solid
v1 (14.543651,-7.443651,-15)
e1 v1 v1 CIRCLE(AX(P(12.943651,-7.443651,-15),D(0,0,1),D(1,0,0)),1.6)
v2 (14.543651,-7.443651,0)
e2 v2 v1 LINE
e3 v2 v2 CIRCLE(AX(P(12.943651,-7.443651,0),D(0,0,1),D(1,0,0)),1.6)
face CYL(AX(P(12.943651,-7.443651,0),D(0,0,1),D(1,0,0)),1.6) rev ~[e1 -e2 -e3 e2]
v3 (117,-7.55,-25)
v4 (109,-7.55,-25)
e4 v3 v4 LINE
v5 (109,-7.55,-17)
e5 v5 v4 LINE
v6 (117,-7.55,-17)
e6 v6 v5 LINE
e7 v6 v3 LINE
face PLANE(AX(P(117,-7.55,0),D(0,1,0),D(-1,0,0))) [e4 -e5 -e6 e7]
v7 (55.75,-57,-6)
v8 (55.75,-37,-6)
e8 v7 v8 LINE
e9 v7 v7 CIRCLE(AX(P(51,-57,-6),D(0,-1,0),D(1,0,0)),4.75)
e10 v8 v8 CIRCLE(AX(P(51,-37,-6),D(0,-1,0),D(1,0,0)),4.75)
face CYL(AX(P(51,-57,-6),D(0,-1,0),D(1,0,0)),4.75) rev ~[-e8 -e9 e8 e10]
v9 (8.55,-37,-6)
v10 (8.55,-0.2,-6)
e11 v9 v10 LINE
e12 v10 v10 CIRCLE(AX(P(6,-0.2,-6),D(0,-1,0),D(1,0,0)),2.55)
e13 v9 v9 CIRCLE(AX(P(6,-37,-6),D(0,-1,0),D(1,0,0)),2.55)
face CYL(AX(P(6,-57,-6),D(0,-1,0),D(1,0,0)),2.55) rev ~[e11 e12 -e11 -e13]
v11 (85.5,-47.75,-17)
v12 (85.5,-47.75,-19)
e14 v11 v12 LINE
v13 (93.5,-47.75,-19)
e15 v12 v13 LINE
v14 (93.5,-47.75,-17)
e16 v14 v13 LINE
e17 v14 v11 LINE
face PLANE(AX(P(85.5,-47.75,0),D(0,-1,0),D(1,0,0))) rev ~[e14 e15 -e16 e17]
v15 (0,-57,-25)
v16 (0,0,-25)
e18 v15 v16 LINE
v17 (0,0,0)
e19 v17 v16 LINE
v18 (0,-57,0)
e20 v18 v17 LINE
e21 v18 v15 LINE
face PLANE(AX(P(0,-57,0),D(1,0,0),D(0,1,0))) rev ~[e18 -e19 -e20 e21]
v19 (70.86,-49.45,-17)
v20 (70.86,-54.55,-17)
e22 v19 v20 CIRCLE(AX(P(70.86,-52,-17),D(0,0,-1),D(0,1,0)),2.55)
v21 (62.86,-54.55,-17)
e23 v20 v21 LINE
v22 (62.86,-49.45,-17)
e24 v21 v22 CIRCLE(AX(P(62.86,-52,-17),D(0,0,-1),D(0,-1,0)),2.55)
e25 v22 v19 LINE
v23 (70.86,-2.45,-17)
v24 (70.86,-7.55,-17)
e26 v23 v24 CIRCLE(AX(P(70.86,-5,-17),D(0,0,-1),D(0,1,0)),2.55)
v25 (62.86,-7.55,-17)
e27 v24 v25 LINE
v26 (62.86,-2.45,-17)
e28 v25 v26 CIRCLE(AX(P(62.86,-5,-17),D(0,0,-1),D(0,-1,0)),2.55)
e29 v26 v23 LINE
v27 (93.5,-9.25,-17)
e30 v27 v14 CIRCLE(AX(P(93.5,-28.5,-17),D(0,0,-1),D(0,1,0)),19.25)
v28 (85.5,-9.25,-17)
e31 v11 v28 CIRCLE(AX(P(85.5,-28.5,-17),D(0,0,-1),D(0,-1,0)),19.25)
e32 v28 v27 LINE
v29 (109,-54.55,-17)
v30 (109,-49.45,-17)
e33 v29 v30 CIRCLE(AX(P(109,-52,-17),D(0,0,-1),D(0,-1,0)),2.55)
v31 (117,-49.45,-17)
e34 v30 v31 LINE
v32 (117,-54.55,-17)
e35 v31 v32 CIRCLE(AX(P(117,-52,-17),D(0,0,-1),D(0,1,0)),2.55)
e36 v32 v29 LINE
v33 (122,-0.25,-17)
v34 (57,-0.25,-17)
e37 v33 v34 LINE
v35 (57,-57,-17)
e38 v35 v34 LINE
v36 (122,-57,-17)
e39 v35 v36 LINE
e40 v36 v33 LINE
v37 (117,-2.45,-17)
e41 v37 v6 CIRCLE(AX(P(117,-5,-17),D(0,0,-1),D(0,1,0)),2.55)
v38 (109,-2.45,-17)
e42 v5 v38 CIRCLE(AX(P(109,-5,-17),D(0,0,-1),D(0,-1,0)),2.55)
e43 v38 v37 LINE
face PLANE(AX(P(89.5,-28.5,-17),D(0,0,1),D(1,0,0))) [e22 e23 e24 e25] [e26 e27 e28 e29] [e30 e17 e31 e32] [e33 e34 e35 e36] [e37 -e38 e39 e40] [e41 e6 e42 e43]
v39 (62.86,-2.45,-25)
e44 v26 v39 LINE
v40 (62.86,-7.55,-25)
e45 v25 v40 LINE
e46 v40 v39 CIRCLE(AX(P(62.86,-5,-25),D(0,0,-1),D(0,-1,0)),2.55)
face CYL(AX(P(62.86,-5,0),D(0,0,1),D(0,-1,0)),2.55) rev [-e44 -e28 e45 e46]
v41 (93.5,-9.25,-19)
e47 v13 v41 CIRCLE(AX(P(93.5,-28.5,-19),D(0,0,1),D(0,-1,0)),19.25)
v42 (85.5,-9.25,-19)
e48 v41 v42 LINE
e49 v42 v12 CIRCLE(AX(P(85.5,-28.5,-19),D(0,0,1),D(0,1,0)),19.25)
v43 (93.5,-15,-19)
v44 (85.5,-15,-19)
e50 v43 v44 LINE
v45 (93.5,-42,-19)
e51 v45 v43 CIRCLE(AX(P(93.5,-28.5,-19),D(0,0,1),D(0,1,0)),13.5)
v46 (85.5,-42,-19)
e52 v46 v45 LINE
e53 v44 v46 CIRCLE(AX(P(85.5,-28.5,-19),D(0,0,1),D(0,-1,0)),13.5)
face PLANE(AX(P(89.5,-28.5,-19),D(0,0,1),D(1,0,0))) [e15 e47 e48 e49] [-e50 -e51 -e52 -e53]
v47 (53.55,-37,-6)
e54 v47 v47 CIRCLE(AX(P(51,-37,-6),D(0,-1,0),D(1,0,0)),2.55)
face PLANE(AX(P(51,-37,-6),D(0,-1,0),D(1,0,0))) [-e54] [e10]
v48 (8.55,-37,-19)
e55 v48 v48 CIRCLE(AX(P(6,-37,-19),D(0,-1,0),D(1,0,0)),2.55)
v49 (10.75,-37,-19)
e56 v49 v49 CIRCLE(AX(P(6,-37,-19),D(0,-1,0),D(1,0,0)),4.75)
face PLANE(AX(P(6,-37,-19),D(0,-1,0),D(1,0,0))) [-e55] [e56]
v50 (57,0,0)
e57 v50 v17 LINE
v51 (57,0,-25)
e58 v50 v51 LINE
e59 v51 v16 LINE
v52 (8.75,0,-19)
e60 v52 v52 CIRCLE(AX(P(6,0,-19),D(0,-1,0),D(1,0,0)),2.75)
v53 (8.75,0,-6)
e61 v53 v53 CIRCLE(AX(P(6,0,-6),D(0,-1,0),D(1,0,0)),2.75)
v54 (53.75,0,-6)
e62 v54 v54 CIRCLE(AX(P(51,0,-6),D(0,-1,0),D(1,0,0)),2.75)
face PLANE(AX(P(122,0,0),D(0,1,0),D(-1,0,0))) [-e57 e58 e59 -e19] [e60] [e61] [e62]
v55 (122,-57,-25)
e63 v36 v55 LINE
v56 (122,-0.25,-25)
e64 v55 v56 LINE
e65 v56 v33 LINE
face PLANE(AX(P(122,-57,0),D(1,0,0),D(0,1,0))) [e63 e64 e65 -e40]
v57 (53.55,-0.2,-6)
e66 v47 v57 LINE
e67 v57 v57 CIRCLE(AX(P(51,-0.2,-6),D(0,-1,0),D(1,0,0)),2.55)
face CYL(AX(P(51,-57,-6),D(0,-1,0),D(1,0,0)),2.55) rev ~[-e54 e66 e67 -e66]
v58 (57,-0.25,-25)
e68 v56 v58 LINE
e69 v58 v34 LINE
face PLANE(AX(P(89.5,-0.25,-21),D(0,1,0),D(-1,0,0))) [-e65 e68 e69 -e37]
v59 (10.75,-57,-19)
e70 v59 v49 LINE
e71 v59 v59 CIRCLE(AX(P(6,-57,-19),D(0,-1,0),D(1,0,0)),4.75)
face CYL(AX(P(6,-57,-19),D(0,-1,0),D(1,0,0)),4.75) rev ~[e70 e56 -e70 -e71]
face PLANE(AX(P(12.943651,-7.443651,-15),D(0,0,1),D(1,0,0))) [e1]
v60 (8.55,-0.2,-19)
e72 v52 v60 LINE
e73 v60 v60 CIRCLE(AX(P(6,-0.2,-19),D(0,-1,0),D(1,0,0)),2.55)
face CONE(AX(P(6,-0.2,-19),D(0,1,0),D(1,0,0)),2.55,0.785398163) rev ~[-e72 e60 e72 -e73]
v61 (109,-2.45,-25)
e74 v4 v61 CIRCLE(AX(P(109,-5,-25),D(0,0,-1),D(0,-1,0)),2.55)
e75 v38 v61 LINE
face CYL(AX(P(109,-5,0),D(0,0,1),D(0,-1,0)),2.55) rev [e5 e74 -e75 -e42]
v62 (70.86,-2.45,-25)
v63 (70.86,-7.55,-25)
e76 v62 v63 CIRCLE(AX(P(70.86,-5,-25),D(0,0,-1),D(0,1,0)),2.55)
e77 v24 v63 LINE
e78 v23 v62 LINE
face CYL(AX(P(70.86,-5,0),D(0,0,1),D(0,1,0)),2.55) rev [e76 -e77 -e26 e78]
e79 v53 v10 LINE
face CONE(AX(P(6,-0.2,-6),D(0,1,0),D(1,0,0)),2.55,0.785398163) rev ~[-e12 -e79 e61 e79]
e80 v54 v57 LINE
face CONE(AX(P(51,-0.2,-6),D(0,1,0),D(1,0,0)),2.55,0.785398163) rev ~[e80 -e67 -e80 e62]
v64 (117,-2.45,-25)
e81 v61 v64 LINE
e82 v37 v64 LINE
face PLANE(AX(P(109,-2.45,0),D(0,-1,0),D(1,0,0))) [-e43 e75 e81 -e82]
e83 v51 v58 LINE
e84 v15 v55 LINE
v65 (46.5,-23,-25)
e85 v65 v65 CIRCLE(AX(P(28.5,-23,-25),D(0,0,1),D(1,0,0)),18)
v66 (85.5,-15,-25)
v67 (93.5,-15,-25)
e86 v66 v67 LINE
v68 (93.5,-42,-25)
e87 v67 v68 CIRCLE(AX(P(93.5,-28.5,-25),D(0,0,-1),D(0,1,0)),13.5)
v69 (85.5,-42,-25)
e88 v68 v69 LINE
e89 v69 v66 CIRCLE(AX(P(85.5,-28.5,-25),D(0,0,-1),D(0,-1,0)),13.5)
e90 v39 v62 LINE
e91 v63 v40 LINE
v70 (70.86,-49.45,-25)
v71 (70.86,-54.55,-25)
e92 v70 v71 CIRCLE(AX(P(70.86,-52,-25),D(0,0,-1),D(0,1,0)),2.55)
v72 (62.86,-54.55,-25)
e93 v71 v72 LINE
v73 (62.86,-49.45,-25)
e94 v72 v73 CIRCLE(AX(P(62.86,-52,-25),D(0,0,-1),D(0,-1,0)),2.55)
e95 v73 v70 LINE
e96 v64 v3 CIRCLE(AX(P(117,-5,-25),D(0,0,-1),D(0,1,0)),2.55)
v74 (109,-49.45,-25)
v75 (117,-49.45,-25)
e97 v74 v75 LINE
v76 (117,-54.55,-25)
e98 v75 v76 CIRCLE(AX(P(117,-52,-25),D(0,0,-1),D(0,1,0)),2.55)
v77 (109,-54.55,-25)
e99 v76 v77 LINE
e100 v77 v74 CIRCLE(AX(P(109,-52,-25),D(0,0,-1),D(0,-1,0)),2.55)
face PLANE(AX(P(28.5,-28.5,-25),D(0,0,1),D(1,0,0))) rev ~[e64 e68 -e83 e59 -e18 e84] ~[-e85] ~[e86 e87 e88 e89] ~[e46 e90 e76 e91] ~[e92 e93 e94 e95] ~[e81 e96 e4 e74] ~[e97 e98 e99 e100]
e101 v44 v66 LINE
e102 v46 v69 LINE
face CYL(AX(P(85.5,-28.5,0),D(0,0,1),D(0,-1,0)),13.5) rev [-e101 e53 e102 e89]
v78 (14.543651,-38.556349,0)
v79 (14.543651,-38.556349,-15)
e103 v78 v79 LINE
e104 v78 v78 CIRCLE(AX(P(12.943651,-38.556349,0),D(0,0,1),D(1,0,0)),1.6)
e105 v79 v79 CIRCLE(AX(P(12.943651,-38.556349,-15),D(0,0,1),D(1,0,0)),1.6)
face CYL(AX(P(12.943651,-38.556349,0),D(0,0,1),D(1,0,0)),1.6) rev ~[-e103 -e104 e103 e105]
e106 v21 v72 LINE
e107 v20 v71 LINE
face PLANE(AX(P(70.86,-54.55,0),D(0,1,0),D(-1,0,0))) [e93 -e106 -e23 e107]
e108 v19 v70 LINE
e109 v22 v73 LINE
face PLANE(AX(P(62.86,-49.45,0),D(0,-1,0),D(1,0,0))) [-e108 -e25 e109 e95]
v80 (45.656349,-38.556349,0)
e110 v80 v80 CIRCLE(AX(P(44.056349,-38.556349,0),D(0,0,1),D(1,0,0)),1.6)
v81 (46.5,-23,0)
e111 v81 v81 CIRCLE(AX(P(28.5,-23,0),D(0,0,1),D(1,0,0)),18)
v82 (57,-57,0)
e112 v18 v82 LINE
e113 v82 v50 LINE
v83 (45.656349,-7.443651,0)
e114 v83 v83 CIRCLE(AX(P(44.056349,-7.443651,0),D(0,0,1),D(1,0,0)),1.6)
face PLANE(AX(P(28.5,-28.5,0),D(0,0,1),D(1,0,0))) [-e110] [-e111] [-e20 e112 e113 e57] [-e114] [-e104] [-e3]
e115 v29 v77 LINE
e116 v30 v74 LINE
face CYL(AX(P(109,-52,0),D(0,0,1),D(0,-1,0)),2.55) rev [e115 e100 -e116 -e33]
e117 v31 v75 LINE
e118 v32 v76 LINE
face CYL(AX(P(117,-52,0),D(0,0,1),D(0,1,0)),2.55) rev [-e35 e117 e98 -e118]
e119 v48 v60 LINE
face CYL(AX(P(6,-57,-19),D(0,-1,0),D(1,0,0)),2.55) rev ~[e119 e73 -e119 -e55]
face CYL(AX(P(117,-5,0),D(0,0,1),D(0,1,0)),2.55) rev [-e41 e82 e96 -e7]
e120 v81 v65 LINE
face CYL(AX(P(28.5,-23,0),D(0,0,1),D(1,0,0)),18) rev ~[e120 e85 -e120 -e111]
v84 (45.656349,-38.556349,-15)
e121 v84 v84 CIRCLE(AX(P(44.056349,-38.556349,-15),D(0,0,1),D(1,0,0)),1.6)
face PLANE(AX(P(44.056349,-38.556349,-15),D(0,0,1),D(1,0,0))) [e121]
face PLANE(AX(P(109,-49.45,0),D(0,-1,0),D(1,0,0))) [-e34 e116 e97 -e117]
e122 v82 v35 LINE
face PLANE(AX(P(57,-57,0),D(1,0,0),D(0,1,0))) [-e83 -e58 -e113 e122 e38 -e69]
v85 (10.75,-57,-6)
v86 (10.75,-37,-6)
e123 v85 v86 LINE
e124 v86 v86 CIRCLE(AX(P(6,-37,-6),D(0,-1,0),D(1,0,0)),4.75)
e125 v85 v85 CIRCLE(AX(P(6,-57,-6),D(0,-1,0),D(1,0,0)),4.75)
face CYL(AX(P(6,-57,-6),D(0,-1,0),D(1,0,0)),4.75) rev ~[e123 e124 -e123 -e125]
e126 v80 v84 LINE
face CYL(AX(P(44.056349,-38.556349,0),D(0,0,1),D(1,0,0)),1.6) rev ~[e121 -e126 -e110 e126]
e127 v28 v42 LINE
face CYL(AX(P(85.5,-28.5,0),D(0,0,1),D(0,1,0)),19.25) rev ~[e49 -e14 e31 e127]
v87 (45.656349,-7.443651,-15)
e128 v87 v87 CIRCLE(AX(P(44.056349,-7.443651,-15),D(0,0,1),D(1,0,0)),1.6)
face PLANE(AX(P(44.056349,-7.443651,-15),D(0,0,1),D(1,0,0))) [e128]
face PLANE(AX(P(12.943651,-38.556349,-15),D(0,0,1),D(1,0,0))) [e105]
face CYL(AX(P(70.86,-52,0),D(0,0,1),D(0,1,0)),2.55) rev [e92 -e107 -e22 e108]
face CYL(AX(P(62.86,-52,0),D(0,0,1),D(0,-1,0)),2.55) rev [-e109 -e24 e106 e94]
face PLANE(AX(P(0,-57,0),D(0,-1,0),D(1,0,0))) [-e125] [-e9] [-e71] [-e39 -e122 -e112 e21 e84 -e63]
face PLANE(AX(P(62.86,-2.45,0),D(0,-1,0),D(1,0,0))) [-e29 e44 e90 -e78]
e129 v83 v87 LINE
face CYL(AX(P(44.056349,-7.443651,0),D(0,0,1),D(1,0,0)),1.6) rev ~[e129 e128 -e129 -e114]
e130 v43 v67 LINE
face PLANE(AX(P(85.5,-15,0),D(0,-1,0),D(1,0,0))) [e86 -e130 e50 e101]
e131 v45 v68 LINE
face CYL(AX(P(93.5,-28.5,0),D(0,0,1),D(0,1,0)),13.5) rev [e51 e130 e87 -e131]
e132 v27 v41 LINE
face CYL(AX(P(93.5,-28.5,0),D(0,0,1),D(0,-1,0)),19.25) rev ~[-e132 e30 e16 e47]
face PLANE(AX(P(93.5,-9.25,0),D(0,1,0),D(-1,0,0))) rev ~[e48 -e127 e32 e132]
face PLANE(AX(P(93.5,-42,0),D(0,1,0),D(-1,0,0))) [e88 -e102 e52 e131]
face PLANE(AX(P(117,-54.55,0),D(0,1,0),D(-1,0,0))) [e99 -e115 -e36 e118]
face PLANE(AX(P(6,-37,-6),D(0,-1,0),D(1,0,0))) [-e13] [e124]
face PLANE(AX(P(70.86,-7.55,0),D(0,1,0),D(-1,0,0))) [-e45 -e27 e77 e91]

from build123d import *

# Parameters (mm, degrees)
F0_W     = 57
F0_H     = 57
F0_R     = 1.6
F0_R_2   = 18
F0_W_2   = 65
F1_DEPTH = 25
F2_DEPTH = 17
F3_DEPTH = 19
F4_R     = 2.55
F5_DEPTH = 60
F4_R_2   = 4.75
F6_DEPTH = 20
F7_DEPTH = 15
F8_W     = 65
F8_H     = 8
F9_DEPTH = 0.25
F10_SIZE = 0.2


# Not quite as in the source:
# - a feature names something its author has since deleted; it is built from what else it names


with BuildPart() as f1:
    # F0 (on Top) → F1 (new body)
    with BuildSketch(Plane.XY):
        with Locations((28.5, -28.5)):
            Rectangle(F0_W, F0_H)
        with Locations((12.9436508139, -38.5563491861)):
            Circle(F0_R, mode=Mode.SUBTRACT)
        with Locations((44.0563491861, -38.5563491861)):
            Circle(F0_R, mode=Mode.SUBTRACT)
        with Locations((28.5, -23)):
            Circle(F0_R_2, mode=Mode.SUBTRACT)
        with Locations((12.9436508139, -7.4436508139)):
            Circle(F0_R, mode=Mode.SUBTRACT)
        with Locations((44.0563491861, -7.4436508139)):
            Circle(F0_R, mode=Mode.SUBTRACT)
        with Locations((89.5, -28.5)):
            Rectangle(F0_W_2, F0_H)
        with BuildLine():
            Line((62.86, -49.45), (70.86, -49.45))
            ThreePointArc((70.86, -49.45), (73.41, -52), (70.86, -54.55))
            Line((70.86, -54.55), (62.86, -54.55))
            ThreePointArc((62.86, -54.55), (60.31, -52), (62.86, -49.45))
        make_face(mode=Mode.SUBTRACT)
        with BuildLine():
            Line((117, -54.55), (109, -54.55))
            ThreePointArc((109, -54.55), (106.45, -52), (109, -49.45))
            Line((109, -49.45), (117, -49.45))
            ThreePointArc((117, -49.45), (119.55, -52), (117, -54.55))
        make_face(mode=Mode.SUBTRACT)
        with BuildLine():
            Line((85.5, -9.25), (93.5, -9.25))
            ThreePointArc((93.5, -9.25), (112.75, -28.5), (93.5, -47.75))
            Line((93.5, -47.75), (85.5, -47.75))
            ThreePointArc((85.5, -47.75), (66.25, -28.5), (85.5, -9.25))
        make_face(mode=Mode.SUBTRACT)
        with BuildLine():
            Line((62.86, -2.45), (70.86, -2.45))
            ThreePointArc((70.86, -2.45), (73.41, -5), (70.86, -7.55))
            Line((70.86, -7.55), (62.86, -7.55))
            ThreePointArc((62.86, -7.55), (60.31, -5), (62.86, -2.45))
        make_face(mode=Mode.SUBTRACT)
        with BuildLine():
            Line((117, -7.55), (109, -7.55))
            ThreePointArc((109, -7.55), (106.45, -5), (109, -2.45))
            Line((109, -2.45), (117, -2.45))
            ThreePointArc((117, -2.45), (119.55, -5), (117, -7.55))
        make_face(mode=Mode.SUBTRACT)
        with Locations((12.9436508139, -7.4436508139)):
            Circle(F0_R)
        with Locations((44.0563491861, -7.4436508139)):
            Circle(F0_R)
        with Locations((44.0563491861, -38.5563491861)):
            Circle(F0_R)
        with Locations((12.9436508139, -38.5563491861)):
            Circle(F0_R)
        with BuildLine():
            ThreePointArc((93.5, -47.75), (112.75, -28.5), (93.5, -9.25))
            Line((93.5, -9.25), (85.5, -9.25))
            ThreePointArc((85.5, -9.25), (66.25, -28.5), (85.5, -47.75))
            Line((85.5, -47.75), (93.5, -47.75))
        make_face()
        with BuildLine():
            Line((85.5, -15), (93.5, -15))
            ThreePointArc((93.5, -15), (107, -28.5), (93.5, -42))
            Line((93.5, -42), (85.5, -42))
            ThreePointArc((85.5, -42), (72, -28.5), (85.5, -15))
        make_face(mode=Mode.SUBTRACT)
    extrude(amount=-F1_DEPTH)

    # F0 (on Top) → F2 (cut)
    with BuildSketch(Plane.XY):
        with Locations((89.5, -28.5)):
            Rectangle(F0_W_2, F0_H)
        with BuildLine():
            Line((62.86, -49.45), (70.86, -49.45))
            ThreePointArc((70.86, -49.45), (73.41, -52), (70.86, -54.55))
            Line((70.86, -54.55), (62.86, -54.55))
            ThreePointArc((62.86, -54.55), (60.31, -52), (62.86, -49.45))
        make_face(mode=Mode.SUBTRACT)
        with BuildLine():
            Line((117, -54.55), (109, -54.55))
            ThreePointArc((109, -54.55), (106.45, -52), (109, -49.45))
            Line((109, -49.45), (117, -49.45))
            ThreePointArc((117, -49.45), (119.55, -52), (117, -54.55))
        make_face(mode=Mode.SUBTRACT)
        with BuildLine():
            Line((85.5, -9.25), (93.5, -9.25))
            ThreePointArc((93.5, -9.25), (112.75, -28.5), (93.5, -47.75))
            Line((93.5, -47.75), (85.5, -47.75))
            ThreePointArc((85.5, -47.75), (66.25, -28.5), (85.5, -9.25))
        make_face(mode=Mode.SUBTRACT)
        with BuildLine():
            Line((62.86, -2.45), (70.86, -2.45))
            ThreePointArc((70.86, -2.45), (73.41, -5), (70.86, -7.55))
            Line((70.86, -7.55), (62.86, -7.55))
            ThreePointArc((62.86, -7.55), (60.31, -5), (62.86, -2.45))
        make_face(mode=Mode.SUBTRACT)
        with BuildLine():
            Line((117, -7.55), (109, -7.55))
            ThreePointArc((109, -7.55), (106.45, -5), (109, -2.45))
            Line((109, -2.45), (117, -2.45))
            ThreePointArc((117, -2.45), (119.55, -5), (117, -7.55))
        make_face(mode=Mode.SUBTRACT)
    extrude(amount=-F2_DEPTH, mode=Mode.SUBTRACT)

    # F0 (on Top) → F3 (cut)
    with BuildSketch(Plane.XY):
        with BuildLine():
            ThreePointArc((93.5, -47.75), (112.75, -28.5), (93.5, -9.25))
            Line((93.5, -9.25), (85.5, -9.25))
            ThreePointArc((85.5, -9.25), (66.25, -28.5), (85.5, -47.75))
            Line((85.5, -47.75), (93.5, -47.75))
        make_face()
        with BuildLine():
            Line((85.5, -15), (93.5, -15))
            ThreePointArc((93.5, -15), (107, -28.5), (93.5, -42))
            Line((93.5, -42), (85.5, -42))
            ThreePointArc((85.5, -42), (72, -28.5), (85.5, -15))
        make_face(mode=Mode.SUBTRACT)
        with BuildLine():
            ThreePointArc((93.5, -42), (107, -28.5), (93.5, -15))
            Line((93.5, -15), (85.5, -15))
            ThreePointArc((85.5, -15), (72, -28.5), (85.5, -42))
            Line((85.5, -42), (93.5, -42))
        make_face()
    extrude(amount=-F3_DEPTH, mode=Mode.SUBTRACT)

    # F4 (on face) → F5 (cut)
    with BuildSketch(Plane.XZ.offset(57)):
        with Locations((6, -6)):
            Circle(F4_R)
        with Locations((6, -19)):
            Circle(F4_R)
        with Locations((51, -6)):
            Circle(F4_R)
    extrude(amount=-F5_DEPTH, mode=Mode.SUBTRACT)

    # F4 (on face) → F6 (cut)
    with BuildSketch(Plane.XZ.offset(57)):
        with Locations((6, -6)):
            Circle(F4_R_2)
        with Locations((6, -6)):
            Circle(F4_R, mode=Mode.SUBTRACT)
        with Locations((6, -19)):
            Circle(F4_R_2)
        with Locations((6, -19)):
            Circle(F4_R, mode=Mode.SUBTRACT)
        with Locations((51, -6)):
            Circle(F4_R_2)
        with Locations((51, -6)):
            Circle(F4_R, mode=Mode.SUBTRACT)
    extrude(amount=-F6_DEPTH, mode=Mode.SUBTRACT)

    # F0 (on Top) → F7 (cut)
    with BuildSketch(Plane.XY):
        with Locations((44.0563491861, -7.4436508139)):
            Circle(F0_R)
        with Locations((44.0563491861, -38.5563491861)):
            Circle(F0_R)
        with Locations((12.9436508139, -38.5563491861)):
            Circle(F0_R)
        with Locations((12.9436508139, -7.4436508139)):
            Circle(F0_R)
    extrude(amount=-F7_DEPTH, mode=Mode.SUBTRACT)

    # F8 (on face) → F9 (cut)
    with BuildSketch(Plane(origin=(0, 0, 0), x_dir=(-1, 0, 0), z_dir=(0, 1, 0))):
        with Locations((-89.5, -21)):
            Rectangle(F8_W, F8_H)
    extrude(amount=-F9_DEPTH, mode=Mode.SUBTRACT)

    # F10
    f10_edges = [f1.edges().sort_by_distance(p)[0] for p in [
        (48.45, 0, -6),
        (3.45, 0, -6),
        (3.45, 0, -19),
    ]]
    chamfer(f10_edges, length=F10_SIZE)


solid = f1.part
